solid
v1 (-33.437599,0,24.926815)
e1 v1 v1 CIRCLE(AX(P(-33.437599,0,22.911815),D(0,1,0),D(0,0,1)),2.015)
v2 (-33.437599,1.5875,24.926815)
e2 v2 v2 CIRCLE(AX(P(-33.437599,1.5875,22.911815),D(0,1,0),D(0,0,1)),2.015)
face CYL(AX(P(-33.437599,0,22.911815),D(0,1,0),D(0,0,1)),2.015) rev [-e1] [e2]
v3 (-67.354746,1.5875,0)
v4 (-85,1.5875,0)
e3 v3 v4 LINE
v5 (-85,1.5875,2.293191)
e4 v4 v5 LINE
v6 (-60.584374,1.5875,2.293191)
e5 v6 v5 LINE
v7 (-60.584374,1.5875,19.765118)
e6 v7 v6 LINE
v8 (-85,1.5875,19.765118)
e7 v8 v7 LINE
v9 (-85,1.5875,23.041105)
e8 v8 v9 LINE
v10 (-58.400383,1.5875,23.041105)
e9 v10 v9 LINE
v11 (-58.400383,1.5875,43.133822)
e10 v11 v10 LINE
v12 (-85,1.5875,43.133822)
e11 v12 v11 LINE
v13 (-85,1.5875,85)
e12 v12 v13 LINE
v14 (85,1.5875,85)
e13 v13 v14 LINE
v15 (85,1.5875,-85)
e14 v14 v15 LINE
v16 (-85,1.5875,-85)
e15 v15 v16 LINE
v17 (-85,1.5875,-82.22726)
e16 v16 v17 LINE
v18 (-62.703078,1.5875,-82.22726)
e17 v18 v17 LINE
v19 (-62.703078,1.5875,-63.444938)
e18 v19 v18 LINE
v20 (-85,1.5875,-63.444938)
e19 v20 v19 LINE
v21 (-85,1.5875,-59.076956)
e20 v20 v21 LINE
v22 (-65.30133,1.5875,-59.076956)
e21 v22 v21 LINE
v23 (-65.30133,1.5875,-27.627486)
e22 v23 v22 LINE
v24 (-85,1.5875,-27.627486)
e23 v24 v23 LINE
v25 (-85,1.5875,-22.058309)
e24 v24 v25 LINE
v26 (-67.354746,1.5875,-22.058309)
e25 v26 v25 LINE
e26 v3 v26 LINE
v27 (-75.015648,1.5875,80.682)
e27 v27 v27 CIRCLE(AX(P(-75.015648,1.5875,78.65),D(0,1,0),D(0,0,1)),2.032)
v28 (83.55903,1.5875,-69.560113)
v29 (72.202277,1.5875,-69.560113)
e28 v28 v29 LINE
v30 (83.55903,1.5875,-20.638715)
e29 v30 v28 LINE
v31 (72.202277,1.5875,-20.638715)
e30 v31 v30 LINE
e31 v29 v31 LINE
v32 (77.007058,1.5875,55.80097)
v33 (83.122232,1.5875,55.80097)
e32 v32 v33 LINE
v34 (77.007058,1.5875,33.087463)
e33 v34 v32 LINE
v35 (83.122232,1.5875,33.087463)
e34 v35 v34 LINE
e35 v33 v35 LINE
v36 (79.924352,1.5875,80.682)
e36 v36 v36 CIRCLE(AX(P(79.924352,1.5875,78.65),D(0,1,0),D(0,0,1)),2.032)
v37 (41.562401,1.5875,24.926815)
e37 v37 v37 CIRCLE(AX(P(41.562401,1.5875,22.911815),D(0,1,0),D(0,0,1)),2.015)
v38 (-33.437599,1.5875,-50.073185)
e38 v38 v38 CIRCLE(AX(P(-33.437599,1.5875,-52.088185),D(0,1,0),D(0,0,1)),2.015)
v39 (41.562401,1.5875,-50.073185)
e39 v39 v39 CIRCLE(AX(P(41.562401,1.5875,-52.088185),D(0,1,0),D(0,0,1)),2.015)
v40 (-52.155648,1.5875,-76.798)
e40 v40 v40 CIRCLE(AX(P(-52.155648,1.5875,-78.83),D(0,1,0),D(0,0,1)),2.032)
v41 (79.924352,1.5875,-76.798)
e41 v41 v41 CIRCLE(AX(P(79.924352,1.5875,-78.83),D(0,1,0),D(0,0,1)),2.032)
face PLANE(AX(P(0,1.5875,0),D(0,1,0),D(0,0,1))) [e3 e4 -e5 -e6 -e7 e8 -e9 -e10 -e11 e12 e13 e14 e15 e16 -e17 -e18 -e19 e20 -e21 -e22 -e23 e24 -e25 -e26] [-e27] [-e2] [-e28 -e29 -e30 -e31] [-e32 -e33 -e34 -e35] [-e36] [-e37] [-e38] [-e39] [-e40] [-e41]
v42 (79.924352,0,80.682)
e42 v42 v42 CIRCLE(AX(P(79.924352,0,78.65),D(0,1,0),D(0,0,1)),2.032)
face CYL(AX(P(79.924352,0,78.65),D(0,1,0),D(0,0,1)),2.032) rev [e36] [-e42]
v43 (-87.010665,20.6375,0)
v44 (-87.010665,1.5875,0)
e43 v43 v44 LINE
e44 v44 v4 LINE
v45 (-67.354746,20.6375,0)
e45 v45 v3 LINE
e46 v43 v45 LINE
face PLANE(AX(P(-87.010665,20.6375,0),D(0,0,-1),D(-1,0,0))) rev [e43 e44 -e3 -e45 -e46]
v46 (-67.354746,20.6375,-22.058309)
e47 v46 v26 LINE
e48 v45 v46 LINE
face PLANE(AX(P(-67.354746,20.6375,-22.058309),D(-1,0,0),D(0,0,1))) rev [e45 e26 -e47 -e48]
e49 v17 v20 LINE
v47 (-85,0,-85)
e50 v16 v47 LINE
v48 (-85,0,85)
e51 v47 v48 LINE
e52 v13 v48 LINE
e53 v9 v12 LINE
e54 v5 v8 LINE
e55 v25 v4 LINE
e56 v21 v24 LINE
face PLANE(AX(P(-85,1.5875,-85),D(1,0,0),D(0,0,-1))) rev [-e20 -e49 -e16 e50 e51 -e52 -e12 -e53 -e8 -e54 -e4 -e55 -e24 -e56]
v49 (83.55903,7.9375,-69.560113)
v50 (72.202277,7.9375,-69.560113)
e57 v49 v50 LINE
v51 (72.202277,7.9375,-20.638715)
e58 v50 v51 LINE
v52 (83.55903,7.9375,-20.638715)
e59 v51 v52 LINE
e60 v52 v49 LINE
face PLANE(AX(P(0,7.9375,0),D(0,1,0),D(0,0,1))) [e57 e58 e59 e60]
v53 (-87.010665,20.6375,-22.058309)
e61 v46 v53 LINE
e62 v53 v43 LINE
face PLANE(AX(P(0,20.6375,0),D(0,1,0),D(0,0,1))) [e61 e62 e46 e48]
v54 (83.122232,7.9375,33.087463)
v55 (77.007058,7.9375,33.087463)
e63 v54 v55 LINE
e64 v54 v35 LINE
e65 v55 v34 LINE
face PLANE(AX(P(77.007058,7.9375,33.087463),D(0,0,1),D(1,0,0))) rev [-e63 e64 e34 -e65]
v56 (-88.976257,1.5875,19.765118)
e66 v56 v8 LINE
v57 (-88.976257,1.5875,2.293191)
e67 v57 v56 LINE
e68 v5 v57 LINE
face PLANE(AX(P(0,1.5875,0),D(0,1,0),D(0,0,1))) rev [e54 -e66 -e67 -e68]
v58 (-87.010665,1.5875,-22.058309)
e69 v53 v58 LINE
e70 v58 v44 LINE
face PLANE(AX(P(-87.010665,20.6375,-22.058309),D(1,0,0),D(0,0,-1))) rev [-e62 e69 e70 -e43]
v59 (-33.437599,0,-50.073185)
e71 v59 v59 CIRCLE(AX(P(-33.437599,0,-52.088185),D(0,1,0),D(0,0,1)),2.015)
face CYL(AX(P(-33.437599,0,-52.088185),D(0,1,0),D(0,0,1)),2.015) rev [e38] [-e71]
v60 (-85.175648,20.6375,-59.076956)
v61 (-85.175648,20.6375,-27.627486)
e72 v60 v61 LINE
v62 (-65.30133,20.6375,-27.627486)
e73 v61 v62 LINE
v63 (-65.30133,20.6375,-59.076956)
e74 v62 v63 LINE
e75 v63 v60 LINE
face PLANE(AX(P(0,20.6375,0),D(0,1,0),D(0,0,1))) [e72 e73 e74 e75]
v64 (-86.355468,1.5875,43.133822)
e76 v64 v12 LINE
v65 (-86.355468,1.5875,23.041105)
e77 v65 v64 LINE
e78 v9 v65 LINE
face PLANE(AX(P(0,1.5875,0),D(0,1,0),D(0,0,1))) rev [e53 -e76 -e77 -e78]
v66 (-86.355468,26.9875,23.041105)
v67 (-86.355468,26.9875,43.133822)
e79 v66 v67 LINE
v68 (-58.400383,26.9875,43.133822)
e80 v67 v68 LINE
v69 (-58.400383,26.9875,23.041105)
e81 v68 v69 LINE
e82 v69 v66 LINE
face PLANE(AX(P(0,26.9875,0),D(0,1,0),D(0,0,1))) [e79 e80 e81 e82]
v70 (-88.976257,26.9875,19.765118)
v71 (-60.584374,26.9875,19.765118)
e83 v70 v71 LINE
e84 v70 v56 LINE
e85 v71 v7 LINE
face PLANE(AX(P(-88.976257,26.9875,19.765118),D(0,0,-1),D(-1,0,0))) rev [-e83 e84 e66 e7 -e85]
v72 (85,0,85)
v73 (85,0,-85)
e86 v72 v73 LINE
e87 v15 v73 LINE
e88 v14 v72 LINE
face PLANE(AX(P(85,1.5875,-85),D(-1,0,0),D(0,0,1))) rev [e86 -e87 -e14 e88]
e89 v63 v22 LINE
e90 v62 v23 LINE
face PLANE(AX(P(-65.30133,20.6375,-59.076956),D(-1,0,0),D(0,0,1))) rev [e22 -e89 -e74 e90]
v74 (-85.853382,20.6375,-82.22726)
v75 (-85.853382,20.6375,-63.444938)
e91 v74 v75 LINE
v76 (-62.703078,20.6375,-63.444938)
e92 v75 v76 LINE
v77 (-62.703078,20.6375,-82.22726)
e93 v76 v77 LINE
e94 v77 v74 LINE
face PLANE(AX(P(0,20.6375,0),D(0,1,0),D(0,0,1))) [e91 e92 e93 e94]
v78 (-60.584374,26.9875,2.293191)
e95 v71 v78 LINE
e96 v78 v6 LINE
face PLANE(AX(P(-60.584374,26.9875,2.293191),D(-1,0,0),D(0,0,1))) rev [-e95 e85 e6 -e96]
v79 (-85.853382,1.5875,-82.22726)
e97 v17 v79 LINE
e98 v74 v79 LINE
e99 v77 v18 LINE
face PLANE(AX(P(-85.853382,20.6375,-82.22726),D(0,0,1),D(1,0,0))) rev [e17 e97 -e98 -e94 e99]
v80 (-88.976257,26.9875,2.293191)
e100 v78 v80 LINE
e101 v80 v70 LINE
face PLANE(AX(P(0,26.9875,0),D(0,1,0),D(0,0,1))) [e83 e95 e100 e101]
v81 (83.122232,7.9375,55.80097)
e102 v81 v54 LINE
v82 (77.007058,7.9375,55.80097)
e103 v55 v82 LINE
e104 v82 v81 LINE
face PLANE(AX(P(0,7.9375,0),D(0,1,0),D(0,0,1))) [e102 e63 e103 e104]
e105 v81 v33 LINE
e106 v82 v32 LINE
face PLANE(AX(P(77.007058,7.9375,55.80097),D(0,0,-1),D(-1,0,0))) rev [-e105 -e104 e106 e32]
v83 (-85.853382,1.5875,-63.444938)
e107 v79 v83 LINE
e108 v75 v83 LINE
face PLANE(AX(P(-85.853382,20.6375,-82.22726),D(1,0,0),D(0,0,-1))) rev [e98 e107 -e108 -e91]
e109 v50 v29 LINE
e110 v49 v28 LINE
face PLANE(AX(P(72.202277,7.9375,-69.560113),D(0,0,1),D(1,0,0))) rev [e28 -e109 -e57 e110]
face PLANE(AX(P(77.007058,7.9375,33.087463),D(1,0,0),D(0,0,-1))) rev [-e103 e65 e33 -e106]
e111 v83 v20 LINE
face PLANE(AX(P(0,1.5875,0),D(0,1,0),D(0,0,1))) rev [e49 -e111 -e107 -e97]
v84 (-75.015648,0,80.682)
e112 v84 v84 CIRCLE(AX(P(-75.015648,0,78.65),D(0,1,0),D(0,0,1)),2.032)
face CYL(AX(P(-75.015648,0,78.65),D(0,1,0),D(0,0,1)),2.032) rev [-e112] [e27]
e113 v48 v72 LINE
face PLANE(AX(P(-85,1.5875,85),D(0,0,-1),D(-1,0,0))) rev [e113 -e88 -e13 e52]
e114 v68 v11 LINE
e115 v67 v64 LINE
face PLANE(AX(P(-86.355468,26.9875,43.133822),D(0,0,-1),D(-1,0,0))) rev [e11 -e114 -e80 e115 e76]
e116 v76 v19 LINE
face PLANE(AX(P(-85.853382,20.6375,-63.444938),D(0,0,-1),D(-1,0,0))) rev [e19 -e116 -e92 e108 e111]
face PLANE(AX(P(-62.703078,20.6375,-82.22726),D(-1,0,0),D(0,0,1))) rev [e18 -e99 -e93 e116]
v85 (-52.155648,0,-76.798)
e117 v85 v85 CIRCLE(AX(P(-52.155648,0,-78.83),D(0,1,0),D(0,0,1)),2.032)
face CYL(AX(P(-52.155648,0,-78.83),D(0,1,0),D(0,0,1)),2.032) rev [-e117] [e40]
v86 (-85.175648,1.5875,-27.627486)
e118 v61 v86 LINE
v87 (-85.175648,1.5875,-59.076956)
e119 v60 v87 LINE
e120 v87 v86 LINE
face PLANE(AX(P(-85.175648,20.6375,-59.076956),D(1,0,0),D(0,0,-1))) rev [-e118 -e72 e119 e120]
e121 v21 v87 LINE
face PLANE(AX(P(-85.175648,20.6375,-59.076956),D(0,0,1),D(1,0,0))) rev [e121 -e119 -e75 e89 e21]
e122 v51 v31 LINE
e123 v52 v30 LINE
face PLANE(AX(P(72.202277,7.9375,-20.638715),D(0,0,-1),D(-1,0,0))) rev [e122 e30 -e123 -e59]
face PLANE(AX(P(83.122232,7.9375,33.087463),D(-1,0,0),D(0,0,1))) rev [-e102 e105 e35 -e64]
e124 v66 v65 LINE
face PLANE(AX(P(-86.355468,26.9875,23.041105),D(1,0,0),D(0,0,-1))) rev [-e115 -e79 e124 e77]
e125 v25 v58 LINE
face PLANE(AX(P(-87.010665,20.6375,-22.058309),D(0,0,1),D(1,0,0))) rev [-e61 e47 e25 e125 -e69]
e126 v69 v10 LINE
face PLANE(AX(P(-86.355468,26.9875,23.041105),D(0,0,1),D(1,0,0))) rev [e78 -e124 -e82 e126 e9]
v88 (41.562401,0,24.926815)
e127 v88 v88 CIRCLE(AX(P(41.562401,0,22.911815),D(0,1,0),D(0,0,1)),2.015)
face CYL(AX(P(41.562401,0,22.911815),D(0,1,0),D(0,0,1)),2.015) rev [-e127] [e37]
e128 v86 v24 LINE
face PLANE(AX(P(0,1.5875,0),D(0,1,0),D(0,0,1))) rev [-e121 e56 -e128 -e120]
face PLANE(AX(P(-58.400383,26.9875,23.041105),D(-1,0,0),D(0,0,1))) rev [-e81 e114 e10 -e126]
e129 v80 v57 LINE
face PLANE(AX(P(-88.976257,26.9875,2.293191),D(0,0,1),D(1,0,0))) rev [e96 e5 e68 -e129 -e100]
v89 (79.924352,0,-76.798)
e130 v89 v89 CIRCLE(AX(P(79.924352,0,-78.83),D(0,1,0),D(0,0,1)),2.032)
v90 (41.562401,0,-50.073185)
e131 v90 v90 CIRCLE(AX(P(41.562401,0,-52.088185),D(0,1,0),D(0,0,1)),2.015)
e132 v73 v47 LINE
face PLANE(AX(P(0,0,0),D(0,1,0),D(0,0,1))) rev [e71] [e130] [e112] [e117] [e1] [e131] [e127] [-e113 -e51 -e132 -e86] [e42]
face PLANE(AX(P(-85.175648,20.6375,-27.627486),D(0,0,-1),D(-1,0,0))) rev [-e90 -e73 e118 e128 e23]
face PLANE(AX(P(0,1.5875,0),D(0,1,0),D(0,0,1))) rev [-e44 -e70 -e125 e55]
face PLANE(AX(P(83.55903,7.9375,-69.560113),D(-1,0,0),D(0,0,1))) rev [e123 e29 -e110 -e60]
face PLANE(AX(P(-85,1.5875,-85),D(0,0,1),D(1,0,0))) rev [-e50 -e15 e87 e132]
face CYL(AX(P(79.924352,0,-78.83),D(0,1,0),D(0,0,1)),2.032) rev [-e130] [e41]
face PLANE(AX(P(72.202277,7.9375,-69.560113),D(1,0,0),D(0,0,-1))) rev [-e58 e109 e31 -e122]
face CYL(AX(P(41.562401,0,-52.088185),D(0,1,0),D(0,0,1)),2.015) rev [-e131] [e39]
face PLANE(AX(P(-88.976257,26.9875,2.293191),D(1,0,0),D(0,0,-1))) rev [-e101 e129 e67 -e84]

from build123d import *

# Parameters (mm, degrees)
SKETCH1_W                     = 170
SKETCH1_H                     = 170
BOSS_EXTRUDE1_DEPTH           = 1.5875
SKETCH2_W                     = 19.874317931
SKETCH2_H                     = 31.449470131
VGA_DEPTH                     = 19.05
SKETCH3_W                     = 19.655918832
SKETCH3_H                     = 22.058308912
HDMI_DEPTH                    = 19.05
SKETCH4_W                     = 28.391882757
SKETCH4_H                     = 17.471927851
USB_1_DEPTH                   = 25.4
SKETCH5_W                     = 27.955084562
SKETCH5_H                     = 20.092717029
ETH_USB_2_DEPTH               = 25.4
SKETCH6_W                     = 6.115174748
SKETCH6_H                     = 22.713506206
FRONT_USB_3_HEADER_DEPTH      = 6.35
SKETCH7_W                     = 11.356753103
SKETCH7_H                     = 48.921397982
ATX_DEPTH                     = 6.35
SKETCH8_W                     = 23.150304402
SKETCH8_H                     = 18.78232244
USB_MOUSE_DEPTH               = 19.05
SKETCH9_R                     = 2.015
LGA_1150_MOUNTING_HOLES_DEPTH = 126.64606768
MAIN_MOUNTING_HOLES_OUTLINE_R = 2.032
MAIN_MOUNTING_HOLES_DEPTH     = 1.5875


# Read off the part's stored shape, not the designer's step: Main Mounting holes
with BuildPart() as part:
    # Sketch1 → Boss-Extrude1 (new body)
    with BuildSketch(Plane(origin=(0, 0, 0), x_dir=(1, 0, 0), z_dir=(0, 1, 0))):
        Rectangle(SKETCH1_W, SKETCH1_H)
    extrude(amount=BOSS_EXTRUDE1_DEPTH)

    # Sketch2 → VGA (add)
    with BuildSketch(Plane(origin=(0, 1.5875, 0), x_dir=(1, 0, 0), z_dir=(0, 1, 0))):
        with Locations((-75.238489308, 43.35222098)):
            Rectangle(SKETCH2_W, SKETCH2_H)
    extrude(amount=VGA_DEPTH)

    # Sketch3 → HDMI (add)
    with BuildSketch(Plane(origin=(0, 1.5875, 0), x_dir=(1, 0, 0), z_dir=(0, 1, 0))):
        with Locations((-77.182705778, 11.029154456)):
            Rectangle(SKETCH3_W, SKETCH3_H)
    extrude(amount=HDMI_DEPTH)

    # Sketch4 → USB_1 (add)
    with BuildSketch(Plane(origin=(0, 1.5875, 0), x_dir=(1, 0, 0), z_dir=(0, 1, 0))):
        with Locations((-74.780315699, -11.029154456)):
            Rectangle(SKETCH4_W, SKETCH4_H)
    extrude(amount=USB_1_DEPTH)

    # Sketch5 → ETH_USB_2 (add)
    with BuildSketch(Plane(origin=(0, 1.5875, 0), x_dir=(1, 0, 0), z_dir=(0, 1, 0))):
        with Locations((-72.377925619, -33.087463367)):
            Rectangle(SKETCH5_W, SKETCH5_H)
    extrude(amount=ETH_USB_2_DEPTH)

    # Sketch6 → Front USB 3 Header (add)
    with BuildSketch(Plane(origin=(0, 1.5875, 0), x_dir=(1, 0, 0), z_dir=(0, 1, 0))):
        with Locations((80.064644879, -44.44421647)):
            Rectangle(SKETCH6_W, SKETCH6_H)
    extrude(amount=FRONT_USB_3_HEADER_DEPTH)

    # Sketch7 → ATX (add)
    with BuildSketch(Plane(origin=(0, 1.5875, 0), x_dir=(1, 0, 0), z_dir=(0, 1, 0))):
        with Locations((77.880653897, 45.099413765)):
            Rectangle(SKETCH7_W, SKETCH7_H)
    extrude(amount=ATX_DEPTH)

    # Sketch8 → USB_MOUSE (add)
    with BuildSketch(Plane(origin=(0, 1.5875, 0), x_dir=(1, 0, 0), z_dir=(0, 1, 0))):
        with Locations((-74.278230021, 72.836099228)):
            Rectangle(SKETCH8_W, SKETCH8_H)
    extrude(amount=USB_MOUSE_DEPTH)

    # Sketch9 → LGA 1150 Mounting holes (cut, through all)
    with BuildSketch(Plane(origin=(0, 1.5875, 0), x_dir=(1, 0, 0), z_dir=(0, 1, 0))):
        with Locations(Location((-33.43759867, 52.088184905, 0), (0, 0, 270))):
            Circle(SKETCH9_R)
        with Locations(Location((41.56240133, 52.088184905, 0), (0, 0, 270))):
            Circle(SKETCH9_R)
        with Locations(Location((41.56240133, -22.911815095, 0), (0, 0, 270))):
            Circle(SKETCH9_R)
        with Locations(Location((-33.43759867, -22.911815095, 0), (0, 0, 270))):
            Circle(SKETCH9_R)
    extrude(amount=-LGA_1150_MOUNTING_HOLES_DEPTH, mode=Mode.SUBTRACT)

    # Main Mounting holes outline → Main Mounting holes (cut)
    with BuildSketch(Plane(origin=(0, 0, 0), x_dir=(1, 0, 0), z_dir=(0, 1, 0))):
        with Locations((79.924351727, 78.83)):
            Circle(MAIN_MOUNTING_HOLES_OUTLINE_R)
        with Locations((79.924351727, -78.65)):
            Circle(MAIN_MOUNTING_HOLES_OUTLINE_R)
        with Locations((-75.015648273, -78.65)):
            Circle(MAIN_MOUNTING_HOLES_OUTLINE_R)
        with Locations((-52.155648273, 78.83)):
            Circle(MAIN_MOUNTING_HOLES_OUTLINE_R)
    extrude(amount=MAIN_MOUNTING_HOLES_DEPTH, mode=Mode.SUBTRACT)


solid = part.part
